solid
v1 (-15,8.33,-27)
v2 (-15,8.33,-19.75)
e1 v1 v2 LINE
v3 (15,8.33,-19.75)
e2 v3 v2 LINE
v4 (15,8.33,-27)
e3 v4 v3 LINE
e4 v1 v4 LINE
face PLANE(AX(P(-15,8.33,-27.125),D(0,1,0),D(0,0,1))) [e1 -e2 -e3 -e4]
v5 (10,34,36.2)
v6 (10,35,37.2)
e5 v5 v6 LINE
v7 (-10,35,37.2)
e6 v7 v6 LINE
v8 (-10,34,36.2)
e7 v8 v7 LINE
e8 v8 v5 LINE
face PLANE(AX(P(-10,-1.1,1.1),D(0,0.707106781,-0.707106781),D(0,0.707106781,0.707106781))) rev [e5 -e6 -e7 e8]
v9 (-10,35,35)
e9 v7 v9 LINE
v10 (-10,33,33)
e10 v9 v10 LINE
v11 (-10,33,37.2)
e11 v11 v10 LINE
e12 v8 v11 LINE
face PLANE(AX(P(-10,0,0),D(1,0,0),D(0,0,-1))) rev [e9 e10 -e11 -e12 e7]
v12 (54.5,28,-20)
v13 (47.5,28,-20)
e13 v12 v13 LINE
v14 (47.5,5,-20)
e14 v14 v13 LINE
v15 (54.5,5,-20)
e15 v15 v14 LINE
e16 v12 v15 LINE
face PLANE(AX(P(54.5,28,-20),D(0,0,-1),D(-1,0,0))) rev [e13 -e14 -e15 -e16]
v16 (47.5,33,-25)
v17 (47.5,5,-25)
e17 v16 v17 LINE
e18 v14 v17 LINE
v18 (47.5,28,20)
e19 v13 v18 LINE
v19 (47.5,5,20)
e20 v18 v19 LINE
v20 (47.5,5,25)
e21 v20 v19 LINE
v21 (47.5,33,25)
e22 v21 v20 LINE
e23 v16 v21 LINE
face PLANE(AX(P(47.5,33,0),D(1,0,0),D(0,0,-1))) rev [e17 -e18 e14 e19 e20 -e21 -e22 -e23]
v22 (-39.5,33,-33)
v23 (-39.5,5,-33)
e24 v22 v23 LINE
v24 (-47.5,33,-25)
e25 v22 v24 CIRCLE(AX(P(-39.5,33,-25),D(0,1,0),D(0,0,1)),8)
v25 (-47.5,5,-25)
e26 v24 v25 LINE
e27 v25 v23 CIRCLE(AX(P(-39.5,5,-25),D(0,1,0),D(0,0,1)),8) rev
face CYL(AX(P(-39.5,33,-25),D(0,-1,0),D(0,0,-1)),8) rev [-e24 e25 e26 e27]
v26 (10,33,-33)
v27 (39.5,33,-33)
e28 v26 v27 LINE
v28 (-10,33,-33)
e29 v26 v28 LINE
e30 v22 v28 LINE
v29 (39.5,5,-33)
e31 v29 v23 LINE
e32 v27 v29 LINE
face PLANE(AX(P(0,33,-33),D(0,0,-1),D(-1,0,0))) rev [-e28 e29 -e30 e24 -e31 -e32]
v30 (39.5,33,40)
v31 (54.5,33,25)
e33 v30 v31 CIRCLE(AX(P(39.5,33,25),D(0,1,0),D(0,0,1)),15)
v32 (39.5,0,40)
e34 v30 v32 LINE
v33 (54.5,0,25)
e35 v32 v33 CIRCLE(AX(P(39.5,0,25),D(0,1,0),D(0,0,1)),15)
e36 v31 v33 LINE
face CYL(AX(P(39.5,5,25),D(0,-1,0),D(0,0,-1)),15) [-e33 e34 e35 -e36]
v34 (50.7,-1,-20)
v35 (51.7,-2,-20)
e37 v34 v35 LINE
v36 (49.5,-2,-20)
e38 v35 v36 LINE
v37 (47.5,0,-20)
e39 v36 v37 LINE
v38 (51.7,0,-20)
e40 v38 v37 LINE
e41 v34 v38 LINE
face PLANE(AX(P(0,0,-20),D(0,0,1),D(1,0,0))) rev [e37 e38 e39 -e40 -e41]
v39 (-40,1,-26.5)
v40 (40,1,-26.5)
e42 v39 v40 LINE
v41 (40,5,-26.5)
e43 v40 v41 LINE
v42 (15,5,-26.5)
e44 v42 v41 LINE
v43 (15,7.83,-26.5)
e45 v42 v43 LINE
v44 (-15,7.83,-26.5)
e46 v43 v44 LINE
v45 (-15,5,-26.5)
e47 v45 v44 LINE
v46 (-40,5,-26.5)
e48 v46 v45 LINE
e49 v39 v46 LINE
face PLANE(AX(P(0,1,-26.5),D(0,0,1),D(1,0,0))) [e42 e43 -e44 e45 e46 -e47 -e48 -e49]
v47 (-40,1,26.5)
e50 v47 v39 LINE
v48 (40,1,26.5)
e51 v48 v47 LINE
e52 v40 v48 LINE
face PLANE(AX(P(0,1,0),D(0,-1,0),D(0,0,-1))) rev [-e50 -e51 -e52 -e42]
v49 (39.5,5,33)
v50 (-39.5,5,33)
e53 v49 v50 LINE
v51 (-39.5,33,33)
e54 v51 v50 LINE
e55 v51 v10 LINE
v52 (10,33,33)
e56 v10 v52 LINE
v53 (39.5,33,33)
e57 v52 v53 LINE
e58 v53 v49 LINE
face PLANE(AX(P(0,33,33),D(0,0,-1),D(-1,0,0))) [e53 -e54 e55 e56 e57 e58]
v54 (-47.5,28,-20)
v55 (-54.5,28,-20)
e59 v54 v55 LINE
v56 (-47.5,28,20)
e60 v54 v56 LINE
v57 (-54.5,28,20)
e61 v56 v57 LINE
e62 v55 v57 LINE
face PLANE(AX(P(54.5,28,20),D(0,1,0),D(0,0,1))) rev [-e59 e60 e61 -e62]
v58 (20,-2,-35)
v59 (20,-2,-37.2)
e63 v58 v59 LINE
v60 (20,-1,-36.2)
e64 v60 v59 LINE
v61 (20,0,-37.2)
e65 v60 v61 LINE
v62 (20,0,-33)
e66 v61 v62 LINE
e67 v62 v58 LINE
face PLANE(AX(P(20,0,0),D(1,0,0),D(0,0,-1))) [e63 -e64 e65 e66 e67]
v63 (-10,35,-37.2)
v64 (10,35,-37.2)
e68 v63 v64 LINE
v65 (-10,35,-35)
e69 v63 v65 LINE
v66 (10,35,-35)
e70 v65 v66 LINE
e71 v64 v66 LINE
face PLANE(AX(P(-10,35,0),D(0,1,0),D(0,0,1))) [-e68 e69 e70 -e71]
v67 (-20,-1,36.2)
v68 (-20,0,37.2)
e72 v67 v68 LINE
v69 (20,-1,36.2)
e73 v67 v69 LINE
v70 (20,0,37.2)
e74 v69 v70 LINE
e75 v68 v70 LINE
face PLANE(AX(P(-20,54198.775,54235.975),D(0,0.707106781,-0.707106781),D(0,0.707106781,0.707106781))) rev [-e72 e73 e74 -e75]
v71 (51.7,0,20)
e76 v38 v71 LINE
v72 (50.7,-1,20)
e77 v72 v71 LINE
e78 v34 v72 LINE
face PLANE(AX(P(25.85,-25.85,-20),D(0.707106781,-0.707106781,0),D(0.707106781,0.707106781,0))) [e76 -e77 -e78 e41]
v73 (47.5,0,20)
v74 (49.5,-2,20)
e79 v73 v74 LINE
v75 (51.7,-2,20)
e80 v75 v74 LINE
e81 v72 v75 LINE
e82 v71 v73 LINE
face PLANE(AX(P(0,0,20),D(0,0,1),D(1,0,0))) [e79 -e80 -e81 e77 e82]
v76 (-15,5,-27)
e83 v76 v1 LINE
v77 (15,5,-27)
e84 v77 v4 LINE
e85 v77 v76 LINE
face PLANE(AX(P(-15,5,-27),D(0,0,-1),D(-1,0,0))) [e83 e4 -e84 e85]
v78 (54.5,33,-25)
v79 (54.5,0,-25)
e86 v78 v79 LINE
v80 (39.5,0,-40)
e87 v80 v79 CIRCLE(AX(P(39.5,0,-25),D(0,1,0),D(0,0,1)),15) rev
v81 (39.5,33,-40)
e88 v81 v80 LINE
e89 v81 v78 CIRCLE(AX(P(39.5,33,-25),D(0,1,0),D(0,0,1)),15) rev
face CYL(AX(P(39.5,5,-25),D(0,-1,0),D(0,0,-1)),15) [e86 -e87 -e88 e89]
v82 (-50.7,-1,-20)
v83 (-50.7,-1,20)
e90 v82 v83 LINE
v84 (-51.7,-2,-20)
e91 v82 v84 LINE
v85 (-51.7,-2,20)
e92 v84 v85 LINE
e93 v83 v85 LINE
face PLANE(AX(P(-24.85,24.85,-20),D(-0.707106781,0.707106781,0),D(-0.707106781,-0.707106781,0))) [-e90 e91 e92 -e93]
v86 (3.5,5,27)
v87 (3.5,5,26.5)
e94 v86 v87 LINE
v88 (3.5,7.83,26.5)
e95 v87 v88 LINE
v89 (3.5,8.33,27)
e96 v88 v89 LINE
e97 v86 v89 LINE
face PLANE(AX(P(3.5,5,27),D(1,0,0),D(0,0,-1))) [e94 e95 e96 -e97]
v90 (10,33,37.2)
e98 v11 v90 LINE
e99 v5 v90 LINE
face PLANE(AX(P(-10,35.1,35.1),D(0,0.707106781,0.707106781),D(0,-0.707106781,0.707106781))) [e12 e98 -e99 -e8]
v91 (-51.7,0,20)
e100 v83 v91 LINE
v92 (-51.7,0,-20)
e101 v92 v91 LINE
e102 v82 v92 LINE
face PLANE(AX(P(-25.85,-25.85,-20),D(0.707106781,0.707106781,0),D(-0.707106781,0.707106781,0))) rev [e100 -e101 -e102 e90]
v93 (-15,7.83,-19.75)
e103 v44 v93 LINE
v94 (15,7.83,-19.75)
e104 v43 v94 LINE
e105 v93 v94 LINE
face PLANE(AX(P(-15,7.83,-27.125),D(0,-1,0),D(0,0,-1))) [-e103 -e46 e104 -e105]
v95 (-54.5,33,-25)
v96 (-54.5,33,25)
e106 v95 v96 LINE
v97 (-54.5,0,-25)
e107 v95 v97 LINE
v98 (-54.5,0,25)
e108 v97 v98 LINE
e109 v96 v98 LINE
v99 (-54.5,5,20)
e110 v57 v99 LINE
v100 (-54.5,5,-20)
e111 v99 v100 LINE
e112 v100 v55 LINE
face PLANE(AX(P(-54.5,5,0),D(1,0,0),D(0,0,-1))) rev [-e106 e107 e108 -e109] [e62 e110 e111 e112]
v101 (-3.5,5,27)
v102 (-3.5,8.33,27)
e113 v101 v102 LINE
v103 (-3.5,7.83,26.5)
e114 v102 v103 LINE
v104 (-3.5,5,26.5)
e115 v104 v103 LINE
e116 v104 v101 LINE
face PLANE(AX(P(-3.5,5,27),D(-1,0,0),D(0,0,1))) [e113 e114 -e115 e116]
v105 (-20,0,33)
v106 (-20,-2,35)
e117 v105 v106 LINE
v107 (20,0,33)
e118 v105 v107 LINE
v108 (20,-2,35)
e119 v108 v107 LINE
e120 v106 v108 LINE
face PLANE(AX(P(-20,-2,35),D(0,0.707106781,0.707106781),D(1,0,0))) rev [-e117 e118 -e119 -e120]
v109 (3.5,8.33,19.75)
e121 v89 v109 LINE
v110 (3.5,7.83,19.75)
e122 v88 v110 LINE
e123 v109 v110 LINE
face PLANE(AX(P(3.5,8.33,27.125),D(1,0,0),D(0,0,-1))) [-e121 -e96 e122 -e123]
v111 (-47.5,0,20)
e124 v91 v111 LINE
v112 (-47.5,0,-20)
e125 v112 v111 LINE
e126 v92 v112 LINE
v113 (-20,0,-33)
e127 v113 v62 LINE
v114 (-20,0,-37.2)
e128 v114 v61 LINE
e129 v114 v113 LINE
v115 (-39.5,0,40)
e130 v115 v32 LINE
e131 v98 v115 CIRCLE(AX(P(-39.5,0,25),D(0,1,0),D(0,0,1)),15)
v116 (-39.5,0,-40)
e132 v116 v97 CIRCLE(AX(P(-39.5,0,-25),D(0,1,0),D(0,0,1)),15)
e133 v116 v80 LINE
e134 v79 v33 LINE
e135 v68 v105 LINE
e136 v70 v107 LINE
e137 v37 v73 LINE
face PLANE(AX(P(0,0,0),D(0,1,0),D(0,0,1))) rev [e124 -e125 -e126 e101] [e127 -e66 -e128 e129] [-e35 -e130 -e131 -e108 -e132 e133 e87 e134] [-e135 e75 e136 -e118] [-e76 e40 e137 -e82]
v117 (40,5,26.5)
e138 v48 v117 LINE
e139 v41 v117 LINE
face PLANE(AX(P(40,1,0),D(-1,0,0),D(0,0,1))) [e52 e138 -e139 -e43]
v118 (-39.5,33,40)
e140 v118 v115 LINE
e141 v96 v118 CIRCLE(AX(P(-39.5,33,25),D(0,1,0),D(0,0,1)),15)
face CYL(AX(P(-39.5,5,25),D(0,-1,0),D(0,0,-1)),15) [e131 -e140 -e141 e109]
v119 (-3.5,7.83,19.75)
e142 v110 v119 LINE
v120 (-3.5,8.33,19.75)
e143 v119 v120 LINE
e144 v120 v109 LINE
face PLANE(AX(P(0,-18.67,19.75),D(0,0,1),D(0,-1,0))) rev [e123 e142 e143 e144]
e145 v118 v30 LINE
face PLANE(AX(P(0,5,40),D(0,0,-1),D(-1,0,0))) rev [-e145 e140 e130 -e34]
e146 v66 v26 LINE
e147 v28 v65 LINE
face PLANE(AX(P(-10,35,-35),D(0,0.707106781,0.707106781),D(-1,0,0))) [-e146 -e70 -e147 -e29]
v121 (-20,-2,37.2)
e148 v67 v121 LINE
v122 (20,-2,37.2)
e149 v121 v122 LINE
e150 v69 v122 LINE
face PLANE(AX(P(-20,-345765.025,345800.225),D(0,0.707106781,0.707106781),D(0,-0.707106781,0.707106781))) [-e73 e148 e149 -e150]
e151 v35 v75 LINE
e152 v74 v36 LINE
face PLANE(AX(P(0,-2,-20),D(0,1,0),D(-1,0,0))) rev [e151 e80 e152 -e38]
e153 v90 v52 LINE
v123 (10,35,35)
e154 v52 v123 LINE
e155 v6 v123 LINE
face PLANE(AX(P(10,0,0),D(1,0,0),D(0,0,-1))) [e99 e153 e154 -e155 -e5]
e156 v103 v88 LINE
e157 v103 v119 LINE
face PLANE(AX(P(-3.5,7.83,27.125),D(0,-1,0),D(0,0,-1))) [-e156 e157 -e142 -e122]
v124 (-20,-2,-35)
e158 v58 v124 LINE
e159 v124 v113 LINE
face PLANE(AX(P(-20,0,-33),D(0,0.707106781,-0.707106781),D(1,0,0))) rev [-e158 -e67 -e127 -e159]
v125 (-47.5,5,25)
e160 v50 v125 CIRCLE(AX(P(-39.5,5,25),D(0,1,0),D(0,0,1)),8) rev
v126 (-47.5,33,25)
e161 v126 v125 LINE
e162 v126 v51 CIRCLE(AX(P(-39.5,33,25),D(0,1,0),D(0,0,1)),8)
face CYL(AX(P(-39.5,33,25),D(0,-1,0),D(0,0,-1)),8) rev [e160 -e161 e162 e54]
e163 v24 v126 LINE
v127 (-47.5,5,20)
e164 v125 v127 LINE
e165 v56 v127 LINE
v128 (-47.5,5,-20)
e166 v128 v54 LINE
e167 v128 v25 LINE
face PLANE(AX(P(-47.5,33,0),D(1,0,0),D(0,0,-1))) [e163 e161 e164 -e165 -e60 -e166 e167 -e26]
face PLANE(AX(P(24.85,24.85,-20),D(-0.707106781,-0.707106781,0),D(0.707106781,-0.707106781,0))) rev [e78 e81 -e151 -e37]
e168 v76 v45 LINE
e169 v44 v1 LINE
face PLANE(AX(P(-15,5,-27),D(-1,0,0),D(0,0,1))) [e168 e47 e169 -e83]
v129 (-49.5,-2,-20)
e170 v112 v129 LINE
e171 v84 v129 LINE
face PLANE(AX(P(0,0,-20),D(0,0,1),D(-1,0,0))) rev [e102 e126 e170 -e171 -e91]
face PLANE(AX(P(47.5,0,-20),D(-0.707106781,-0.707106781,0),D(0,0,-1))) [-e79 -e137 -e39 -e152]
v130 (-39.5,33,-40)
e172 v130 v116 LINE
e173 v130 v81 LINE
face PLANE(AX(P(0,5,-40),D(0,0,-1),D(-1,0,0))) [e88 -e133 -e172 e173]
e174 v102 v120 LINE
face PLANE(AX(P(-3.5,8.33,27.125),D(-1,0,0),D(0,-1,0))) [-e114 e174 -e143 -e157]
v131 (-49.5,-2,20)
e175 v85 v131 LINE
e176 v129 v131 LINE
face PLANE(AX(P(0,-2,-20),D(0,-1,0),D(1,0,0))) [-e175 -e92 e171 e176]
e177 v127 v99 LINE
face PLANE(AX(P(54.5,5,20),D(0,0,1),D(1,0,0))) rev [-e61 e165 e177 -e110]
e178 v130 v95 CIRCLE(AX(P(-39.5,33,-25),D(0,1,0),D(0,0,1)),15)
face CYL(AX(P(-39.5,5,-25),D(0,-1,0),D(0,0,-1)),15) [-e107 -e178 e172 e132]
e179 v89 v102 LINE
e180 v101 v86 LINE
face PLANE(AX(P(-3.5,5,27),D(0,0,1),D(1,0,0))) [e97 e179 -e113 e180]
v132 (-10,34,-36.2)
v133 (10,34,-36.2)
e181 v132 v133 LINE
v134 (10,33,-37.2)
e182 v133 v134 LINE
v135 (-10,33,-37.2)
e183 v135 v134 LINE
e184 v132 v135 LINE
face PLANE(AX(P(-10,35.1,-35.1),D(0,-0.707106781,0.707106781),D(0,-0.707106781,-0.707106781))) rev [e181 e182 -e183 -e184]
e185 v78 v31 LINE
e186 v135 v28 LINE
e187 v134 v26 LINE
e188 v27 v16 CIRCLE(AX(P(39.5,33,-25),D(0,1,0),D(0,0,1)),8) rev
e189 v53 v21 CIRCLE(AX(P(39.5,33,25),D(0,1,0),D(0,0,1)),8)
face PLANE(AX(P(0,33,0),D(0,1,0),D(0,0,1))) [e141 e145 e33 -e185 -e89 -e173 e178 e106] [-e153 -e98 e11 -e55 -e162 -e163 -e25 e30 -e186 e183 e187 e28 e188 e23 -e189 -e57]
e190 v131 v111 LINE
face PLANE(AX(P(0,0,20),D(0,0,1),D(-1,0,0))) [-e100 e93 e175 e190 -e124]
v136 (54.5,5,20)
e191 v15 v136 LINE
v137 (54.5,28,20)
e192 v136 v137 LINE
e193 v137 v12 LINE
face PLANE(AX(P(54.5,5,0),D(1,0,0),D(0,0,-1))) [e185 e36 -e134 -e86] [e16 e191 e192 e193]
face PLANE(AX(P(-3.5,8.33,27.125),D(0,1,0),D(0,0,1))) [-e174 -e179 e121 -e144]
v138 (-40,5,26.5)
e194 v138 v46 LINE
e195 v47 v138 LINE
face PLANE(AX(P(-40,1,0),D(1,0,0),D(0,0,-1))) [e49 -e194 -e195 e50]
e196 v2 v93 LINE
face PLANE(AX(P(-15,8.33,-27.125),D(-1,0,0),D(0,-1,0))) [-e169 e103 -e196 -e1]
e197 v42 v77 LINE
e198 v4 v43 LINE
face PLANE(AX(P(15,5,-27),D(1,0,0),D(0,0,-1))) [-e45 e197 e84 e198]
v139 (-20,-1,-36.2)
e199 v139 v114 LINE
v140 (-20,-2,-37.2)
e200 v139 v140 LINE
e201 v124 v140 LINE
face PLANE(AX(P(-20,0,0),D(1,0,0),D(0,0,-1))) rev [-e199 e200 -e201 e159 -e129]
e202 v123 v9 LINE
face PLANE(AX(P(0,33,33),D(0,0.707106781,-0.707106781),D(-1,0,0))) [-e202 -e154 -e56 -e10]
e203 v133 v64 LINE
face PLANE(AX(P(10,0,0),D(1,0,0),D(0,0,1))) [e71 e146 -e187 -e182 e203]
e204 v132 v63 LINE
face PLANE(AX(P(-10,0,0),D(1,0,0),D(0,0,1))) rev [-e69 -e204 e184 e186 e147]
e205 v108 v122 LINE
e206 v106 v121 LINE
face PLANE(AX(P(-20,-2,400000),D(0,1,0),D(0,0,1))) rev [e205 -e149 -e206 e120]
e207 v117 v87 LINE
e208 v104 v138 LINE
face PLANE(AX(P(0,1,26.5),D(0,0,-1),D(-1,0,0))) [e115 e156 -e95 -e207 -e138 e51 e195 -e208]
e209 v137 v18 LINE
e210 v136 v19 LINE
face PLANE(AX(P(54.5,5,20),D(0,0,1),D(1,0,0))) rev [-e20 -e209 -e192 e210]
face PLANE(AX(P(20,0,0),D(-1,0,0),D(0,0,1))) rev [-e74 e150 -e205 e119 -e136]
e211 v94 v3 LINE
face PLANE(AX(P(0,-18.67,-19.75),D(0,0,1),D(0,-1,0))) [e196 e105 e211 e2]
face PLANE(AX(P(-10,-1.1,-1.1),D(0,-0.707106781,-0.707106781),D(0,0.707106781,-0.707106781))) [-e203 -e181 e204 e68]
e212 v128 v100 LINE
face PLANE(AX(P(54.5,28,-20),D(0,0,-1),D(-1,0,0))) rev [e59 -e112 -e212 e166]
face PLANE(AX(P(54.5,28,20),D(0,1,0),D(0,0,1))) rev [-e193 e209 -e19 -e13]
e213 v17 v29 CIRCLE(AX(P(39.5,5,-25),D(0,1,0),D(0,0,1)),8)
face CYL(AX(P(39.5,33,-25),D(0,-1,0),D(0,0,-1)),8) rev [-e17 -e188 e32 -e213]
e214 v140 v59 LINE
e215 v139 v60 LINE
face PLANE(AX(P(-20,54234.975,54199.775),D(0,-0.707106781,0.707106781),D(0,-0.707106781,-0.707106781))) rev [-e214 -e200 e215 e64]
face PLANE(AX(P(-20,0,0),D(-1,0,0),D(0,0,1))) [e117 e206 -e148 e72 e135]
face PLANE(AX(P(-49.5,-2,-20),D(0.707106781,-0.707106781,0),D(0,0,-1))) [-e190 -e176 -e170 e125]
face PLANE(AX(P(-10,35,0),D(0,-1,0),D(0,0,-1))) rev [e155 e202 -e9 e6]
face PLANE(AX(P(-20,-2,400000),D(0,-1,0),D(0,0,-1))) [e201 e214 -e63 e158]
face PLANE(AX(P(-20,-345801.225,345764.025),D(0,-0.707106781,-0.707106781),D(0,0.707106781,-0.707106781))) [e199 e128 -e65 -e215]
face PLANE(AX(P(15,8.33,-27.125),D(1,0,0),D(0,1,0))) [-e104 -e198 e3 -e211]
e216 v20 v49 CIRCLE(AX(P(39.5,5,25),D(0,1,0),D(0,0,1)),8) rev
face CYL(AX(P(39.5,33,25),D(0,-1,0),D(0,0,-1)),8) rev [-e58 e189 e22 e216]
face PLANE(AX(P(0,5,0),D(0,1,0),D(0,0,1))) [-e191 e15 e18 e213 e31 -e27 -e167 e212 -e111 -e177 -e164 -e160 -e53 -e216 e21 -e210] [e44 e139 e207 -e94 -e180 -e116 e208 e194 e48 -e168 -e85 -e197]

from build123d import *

# Parameters (mm, degrees)
BOSS_EXTRUDE1_DEPTH     = 5
BOSS_EXTRUDE3_DEPTH     = 33
CUT_EXTRUDE2_DEPTH      = 121.706255016
CUT_EXTRUDE2_DEPTH_BACK = 121.706255016
SKETCH7_W               = 40
SKETCH7_H               = 23
CUT_EXTRUDE4_START      = 5
SKETCH3_W               = 80
SKETCH3_H               = 53
CUT_EXTRUDE4_DEPTH      = 4
SKETCH11_W              = 30
SKETCH11_H              = 0.5
SKETCH10_W              = 7
SKETCH10_H              = 0.5
BOSS_EXTRUDE4_START     = -54.5
BOSS_EXTRUDE4_DEPTH     = 20
BOSS_EXTRUDE5_DEPTH     = 20
BOSS_EXTRUDE6_DEPTH     = 10
CHAMFER1_SIZE           = 2


with BuildPart() as part:
    # Sketch1 → Boss-Extrude1 (new body)
    with BuildSketch(Plane(origin=(0, 0, 0), x_dir=(1, 0, 0), z_dir=(0, 1, 0))):
        with BuildLine():
            Line((-39.5, 40), (39.5, 40))
            ThreePointArc((39.5, 40), (50.106601718, 35.606601718), (54.5, 25))
            Line((54.5, 25), (54.5, -25))
            ThreePointArc((54.5, -25), (50.106601718, -35.606601718), (39.5, -40))
            Line((39.5, -40), (-39.5, -40))
            ThreePointArc((-39.5, -40), (-50.106601718, -35.606601718), (-54.5, -25))
            Line((-54.5, -25), (-54.5, 25))
            ThreePointArc((-54.5, 25), (-50.106601718, 35.606601718), (-39.5, 40))
        make_face()
    extrude(amount=BOSS_EXTRUDE1_DEPTH)

    # Sketch1<3> → Boss-Extrude3 (add)
    with BuildSketch(Plane(origin=(0, 0, 0), x_dir=(1, 0, 0), z_dir=(0, 1, 0))):
        with BuildLine():
            Line((-39.5, 40), (39.5, 40))
            ThreePointArc((39.5, 40), (50.106601718, 35.606601718), (54.5, 25))
            Line((54.5, 25), (54.5, -25))
            ThreePointArc((54.5, -25), (50.106601718, -35.606601718), (39.5, -40))
            Line((39.5, -40), (-39.5, -40))
            ThreePointArc((-39.5, -40), (-50.106601718, -35.606601718), (-54.5, -25))
            Line((-54.5, -25), (-54.5, 25))
            ThreePointArc((-54.5, 25), (-50.106601718, 35.606601718), (-39.5, 40))
        make_face()
        with BuildLine():
            ThreePointArc((-39.5, 33), (-45.156854249, 30.656854249), (-47.5, 25))
            Line((-47.5, 25), (-47.5, -25))
            ThreePointArc((-47.5, -25), (-45.156854249, -30.656854249), (-39.5, -33))
            Line((-39.5, -33), (39.5, -33))
            ThreePointArc((39.5, -33), (45.156854249, -30.656854249), (47.5, -25))
            Line((47.5, -25), (47.5, 25))
            ThreePointArc((47.5, 25), (45.156854249, 30.656854249), (39.5, 33))
            Line((39.5, 33), (-39.5, 33))
        make_face(mode=Mode.SUBTRACT)
    extrude(amount=BOSS_EXTRUDE3_DEPTH)

    # Sketch7 → Cut-Extrude2 (cut, two sides: drawn at the far end of the back side and taken through both)
    with BuildSketch(Plane.ZY.offset(54.5).offset(-CUT_EXTRUDE2_DEPTH_BACK)):
        with Locations((0, 16.5)):
            Rectangle(SKETCH7_W, SKETCH7_H)
    extrude(amount=CUT_EXTRUDE2_DEPTH + CUT_EXTRUDE2_DEPTH_BACK, mode=Mode.SUBTRACT)

    # Sketch3 → Cut-Extrude4 (cut)
    with BuildSketch(Plane(origin=(0, 0, 0), x_dir=(1, 0, 0), z_dir=(0, 1, 0)).offset(CUT_EXTRUDE4_START)):
        Rectangle(SKETCH3_W, SKETCH3_H)
    extrude(amount=-CUT_EXTRUDE4_DEPTH, mode=Mode.SUBTRACT)

    # Sweep2: sweep along a path in Sketch13
    with BuildLine(Plane(origin=(0, 0, 0), x_dir=(0, 0, -1), z_dir=(1, 0, 0))) as sweep2_path:
        Line((26.75, 5), (26.75, 8.08))
        Line((26.75, 8.08), (19.75, 8.08))
    # Sketch11 → Sweep2 (sweep)
    with BuildSketch(Plane(origin=(0, 5, 0), x_dir=(1, 0, 0), z_dir=(0, 1, 0))):
        with Locations((0, 26.75)):
            Rectangle(SKETCH11_W, SKETCH11_H)
    sweep(path=sweep2_path.line, transition=Transition.RIGHT)

    # Sweep3: sweep along a path in Sketch12
    with BuildLine(Plane(origin=(0, 0, 0), x_dir=(0, 0, -1), z_dir=(1, 0, 0))) as sweep3_path:
        Line((-26.75, 5), (-26.75, 8.08))
        Line((-26.75, 8.08), (-19.75, 8.08))
    # Sketch10 → Sweep3 (sweep)
    with BuildSketch(Plane(origin=(0, 5, 0), x_dir=(1, 0, 0), z_dir=(0, 1, 0))):
        with Locations((0, -26.75)):
            Rectangle(SKETCH10_W, SKETCH10_H)
    sweep(path=sweep3_path.line, transition=Transition.RIGHT)

    # Sketch19 → Boss-Extrude4 (add, symmetric)
    with BuildSketch(Plane(origin=(54.5, 0, 0), x_dir=(0, 0, -1), z_dir=(1, 0, 0)).offset(BOSS_EXTRUDE4_START)):
        Polygon((36.2, -1), (37.2, 0), (33, 0), (33, -2), (37.2, -2), align=None)
    boss_extrude4 = extrude(amount=BOSS_EXTRUDE4_DEPTH, both=True)

    # Mirror2: Boss-Extrude4 across plane
    add(boss_extrude4.mirror(Plane.XY))

    # Sketch20 → Boss-Extrude5 (add, symmetric)
    with BuildSketch(Plane.XY):
        Polygon((50.7, -1), (51.7, 0), (47.5, 0), (47.5, -2), (51.7, -2), align=None)
    boss_extrude5 = extrude(amount=BOSS_EXTRUDE5_DEPTH, both=True)

    # Mirror3: Boss-Extrude5 across plane
    add(boss_extrude5.mirror(Plane(origin=(0, 0, 0), x_dir=(0, 0, 1), z_dir=(1, 0, 0))))

    # Sketch21 → Boss-Extrude6 (add, symmetric)
    with BuildSketch(Plane(origin=(0, 0, 0), x_dir=(0, 0, -1), z_dir=(1, 0, 0))):
        Polygon((-36.2, 34), (-37.2, 33), (-33, 33), (-33, 35), (-37.2, 35), align=None)
    boss_extrude6 = extrude(amount=BOSS_EXTRUDE6_DEPTH, both=True)

    # Mirror4: Boss-Extrude6 across plane
    add(boss_extrude6.mirror(Plane.XY))

    # Chamfer1
    chamfer1_edges = [part.edges().sort_by_distance(p)[0] for p in [
        (-47.5, -2, 0),
        (0, -2, -33),
        (47.5, -2, 0),
        (0, -2, 33),
        (0, 35, -33),
        (0, 35, 33),
    ]]
    chamfer(chamfer1_edges, length=CHAMFER1_SIZE - 0.0001)  # a hair under: the kernel refuses the full size


solid = part.part
